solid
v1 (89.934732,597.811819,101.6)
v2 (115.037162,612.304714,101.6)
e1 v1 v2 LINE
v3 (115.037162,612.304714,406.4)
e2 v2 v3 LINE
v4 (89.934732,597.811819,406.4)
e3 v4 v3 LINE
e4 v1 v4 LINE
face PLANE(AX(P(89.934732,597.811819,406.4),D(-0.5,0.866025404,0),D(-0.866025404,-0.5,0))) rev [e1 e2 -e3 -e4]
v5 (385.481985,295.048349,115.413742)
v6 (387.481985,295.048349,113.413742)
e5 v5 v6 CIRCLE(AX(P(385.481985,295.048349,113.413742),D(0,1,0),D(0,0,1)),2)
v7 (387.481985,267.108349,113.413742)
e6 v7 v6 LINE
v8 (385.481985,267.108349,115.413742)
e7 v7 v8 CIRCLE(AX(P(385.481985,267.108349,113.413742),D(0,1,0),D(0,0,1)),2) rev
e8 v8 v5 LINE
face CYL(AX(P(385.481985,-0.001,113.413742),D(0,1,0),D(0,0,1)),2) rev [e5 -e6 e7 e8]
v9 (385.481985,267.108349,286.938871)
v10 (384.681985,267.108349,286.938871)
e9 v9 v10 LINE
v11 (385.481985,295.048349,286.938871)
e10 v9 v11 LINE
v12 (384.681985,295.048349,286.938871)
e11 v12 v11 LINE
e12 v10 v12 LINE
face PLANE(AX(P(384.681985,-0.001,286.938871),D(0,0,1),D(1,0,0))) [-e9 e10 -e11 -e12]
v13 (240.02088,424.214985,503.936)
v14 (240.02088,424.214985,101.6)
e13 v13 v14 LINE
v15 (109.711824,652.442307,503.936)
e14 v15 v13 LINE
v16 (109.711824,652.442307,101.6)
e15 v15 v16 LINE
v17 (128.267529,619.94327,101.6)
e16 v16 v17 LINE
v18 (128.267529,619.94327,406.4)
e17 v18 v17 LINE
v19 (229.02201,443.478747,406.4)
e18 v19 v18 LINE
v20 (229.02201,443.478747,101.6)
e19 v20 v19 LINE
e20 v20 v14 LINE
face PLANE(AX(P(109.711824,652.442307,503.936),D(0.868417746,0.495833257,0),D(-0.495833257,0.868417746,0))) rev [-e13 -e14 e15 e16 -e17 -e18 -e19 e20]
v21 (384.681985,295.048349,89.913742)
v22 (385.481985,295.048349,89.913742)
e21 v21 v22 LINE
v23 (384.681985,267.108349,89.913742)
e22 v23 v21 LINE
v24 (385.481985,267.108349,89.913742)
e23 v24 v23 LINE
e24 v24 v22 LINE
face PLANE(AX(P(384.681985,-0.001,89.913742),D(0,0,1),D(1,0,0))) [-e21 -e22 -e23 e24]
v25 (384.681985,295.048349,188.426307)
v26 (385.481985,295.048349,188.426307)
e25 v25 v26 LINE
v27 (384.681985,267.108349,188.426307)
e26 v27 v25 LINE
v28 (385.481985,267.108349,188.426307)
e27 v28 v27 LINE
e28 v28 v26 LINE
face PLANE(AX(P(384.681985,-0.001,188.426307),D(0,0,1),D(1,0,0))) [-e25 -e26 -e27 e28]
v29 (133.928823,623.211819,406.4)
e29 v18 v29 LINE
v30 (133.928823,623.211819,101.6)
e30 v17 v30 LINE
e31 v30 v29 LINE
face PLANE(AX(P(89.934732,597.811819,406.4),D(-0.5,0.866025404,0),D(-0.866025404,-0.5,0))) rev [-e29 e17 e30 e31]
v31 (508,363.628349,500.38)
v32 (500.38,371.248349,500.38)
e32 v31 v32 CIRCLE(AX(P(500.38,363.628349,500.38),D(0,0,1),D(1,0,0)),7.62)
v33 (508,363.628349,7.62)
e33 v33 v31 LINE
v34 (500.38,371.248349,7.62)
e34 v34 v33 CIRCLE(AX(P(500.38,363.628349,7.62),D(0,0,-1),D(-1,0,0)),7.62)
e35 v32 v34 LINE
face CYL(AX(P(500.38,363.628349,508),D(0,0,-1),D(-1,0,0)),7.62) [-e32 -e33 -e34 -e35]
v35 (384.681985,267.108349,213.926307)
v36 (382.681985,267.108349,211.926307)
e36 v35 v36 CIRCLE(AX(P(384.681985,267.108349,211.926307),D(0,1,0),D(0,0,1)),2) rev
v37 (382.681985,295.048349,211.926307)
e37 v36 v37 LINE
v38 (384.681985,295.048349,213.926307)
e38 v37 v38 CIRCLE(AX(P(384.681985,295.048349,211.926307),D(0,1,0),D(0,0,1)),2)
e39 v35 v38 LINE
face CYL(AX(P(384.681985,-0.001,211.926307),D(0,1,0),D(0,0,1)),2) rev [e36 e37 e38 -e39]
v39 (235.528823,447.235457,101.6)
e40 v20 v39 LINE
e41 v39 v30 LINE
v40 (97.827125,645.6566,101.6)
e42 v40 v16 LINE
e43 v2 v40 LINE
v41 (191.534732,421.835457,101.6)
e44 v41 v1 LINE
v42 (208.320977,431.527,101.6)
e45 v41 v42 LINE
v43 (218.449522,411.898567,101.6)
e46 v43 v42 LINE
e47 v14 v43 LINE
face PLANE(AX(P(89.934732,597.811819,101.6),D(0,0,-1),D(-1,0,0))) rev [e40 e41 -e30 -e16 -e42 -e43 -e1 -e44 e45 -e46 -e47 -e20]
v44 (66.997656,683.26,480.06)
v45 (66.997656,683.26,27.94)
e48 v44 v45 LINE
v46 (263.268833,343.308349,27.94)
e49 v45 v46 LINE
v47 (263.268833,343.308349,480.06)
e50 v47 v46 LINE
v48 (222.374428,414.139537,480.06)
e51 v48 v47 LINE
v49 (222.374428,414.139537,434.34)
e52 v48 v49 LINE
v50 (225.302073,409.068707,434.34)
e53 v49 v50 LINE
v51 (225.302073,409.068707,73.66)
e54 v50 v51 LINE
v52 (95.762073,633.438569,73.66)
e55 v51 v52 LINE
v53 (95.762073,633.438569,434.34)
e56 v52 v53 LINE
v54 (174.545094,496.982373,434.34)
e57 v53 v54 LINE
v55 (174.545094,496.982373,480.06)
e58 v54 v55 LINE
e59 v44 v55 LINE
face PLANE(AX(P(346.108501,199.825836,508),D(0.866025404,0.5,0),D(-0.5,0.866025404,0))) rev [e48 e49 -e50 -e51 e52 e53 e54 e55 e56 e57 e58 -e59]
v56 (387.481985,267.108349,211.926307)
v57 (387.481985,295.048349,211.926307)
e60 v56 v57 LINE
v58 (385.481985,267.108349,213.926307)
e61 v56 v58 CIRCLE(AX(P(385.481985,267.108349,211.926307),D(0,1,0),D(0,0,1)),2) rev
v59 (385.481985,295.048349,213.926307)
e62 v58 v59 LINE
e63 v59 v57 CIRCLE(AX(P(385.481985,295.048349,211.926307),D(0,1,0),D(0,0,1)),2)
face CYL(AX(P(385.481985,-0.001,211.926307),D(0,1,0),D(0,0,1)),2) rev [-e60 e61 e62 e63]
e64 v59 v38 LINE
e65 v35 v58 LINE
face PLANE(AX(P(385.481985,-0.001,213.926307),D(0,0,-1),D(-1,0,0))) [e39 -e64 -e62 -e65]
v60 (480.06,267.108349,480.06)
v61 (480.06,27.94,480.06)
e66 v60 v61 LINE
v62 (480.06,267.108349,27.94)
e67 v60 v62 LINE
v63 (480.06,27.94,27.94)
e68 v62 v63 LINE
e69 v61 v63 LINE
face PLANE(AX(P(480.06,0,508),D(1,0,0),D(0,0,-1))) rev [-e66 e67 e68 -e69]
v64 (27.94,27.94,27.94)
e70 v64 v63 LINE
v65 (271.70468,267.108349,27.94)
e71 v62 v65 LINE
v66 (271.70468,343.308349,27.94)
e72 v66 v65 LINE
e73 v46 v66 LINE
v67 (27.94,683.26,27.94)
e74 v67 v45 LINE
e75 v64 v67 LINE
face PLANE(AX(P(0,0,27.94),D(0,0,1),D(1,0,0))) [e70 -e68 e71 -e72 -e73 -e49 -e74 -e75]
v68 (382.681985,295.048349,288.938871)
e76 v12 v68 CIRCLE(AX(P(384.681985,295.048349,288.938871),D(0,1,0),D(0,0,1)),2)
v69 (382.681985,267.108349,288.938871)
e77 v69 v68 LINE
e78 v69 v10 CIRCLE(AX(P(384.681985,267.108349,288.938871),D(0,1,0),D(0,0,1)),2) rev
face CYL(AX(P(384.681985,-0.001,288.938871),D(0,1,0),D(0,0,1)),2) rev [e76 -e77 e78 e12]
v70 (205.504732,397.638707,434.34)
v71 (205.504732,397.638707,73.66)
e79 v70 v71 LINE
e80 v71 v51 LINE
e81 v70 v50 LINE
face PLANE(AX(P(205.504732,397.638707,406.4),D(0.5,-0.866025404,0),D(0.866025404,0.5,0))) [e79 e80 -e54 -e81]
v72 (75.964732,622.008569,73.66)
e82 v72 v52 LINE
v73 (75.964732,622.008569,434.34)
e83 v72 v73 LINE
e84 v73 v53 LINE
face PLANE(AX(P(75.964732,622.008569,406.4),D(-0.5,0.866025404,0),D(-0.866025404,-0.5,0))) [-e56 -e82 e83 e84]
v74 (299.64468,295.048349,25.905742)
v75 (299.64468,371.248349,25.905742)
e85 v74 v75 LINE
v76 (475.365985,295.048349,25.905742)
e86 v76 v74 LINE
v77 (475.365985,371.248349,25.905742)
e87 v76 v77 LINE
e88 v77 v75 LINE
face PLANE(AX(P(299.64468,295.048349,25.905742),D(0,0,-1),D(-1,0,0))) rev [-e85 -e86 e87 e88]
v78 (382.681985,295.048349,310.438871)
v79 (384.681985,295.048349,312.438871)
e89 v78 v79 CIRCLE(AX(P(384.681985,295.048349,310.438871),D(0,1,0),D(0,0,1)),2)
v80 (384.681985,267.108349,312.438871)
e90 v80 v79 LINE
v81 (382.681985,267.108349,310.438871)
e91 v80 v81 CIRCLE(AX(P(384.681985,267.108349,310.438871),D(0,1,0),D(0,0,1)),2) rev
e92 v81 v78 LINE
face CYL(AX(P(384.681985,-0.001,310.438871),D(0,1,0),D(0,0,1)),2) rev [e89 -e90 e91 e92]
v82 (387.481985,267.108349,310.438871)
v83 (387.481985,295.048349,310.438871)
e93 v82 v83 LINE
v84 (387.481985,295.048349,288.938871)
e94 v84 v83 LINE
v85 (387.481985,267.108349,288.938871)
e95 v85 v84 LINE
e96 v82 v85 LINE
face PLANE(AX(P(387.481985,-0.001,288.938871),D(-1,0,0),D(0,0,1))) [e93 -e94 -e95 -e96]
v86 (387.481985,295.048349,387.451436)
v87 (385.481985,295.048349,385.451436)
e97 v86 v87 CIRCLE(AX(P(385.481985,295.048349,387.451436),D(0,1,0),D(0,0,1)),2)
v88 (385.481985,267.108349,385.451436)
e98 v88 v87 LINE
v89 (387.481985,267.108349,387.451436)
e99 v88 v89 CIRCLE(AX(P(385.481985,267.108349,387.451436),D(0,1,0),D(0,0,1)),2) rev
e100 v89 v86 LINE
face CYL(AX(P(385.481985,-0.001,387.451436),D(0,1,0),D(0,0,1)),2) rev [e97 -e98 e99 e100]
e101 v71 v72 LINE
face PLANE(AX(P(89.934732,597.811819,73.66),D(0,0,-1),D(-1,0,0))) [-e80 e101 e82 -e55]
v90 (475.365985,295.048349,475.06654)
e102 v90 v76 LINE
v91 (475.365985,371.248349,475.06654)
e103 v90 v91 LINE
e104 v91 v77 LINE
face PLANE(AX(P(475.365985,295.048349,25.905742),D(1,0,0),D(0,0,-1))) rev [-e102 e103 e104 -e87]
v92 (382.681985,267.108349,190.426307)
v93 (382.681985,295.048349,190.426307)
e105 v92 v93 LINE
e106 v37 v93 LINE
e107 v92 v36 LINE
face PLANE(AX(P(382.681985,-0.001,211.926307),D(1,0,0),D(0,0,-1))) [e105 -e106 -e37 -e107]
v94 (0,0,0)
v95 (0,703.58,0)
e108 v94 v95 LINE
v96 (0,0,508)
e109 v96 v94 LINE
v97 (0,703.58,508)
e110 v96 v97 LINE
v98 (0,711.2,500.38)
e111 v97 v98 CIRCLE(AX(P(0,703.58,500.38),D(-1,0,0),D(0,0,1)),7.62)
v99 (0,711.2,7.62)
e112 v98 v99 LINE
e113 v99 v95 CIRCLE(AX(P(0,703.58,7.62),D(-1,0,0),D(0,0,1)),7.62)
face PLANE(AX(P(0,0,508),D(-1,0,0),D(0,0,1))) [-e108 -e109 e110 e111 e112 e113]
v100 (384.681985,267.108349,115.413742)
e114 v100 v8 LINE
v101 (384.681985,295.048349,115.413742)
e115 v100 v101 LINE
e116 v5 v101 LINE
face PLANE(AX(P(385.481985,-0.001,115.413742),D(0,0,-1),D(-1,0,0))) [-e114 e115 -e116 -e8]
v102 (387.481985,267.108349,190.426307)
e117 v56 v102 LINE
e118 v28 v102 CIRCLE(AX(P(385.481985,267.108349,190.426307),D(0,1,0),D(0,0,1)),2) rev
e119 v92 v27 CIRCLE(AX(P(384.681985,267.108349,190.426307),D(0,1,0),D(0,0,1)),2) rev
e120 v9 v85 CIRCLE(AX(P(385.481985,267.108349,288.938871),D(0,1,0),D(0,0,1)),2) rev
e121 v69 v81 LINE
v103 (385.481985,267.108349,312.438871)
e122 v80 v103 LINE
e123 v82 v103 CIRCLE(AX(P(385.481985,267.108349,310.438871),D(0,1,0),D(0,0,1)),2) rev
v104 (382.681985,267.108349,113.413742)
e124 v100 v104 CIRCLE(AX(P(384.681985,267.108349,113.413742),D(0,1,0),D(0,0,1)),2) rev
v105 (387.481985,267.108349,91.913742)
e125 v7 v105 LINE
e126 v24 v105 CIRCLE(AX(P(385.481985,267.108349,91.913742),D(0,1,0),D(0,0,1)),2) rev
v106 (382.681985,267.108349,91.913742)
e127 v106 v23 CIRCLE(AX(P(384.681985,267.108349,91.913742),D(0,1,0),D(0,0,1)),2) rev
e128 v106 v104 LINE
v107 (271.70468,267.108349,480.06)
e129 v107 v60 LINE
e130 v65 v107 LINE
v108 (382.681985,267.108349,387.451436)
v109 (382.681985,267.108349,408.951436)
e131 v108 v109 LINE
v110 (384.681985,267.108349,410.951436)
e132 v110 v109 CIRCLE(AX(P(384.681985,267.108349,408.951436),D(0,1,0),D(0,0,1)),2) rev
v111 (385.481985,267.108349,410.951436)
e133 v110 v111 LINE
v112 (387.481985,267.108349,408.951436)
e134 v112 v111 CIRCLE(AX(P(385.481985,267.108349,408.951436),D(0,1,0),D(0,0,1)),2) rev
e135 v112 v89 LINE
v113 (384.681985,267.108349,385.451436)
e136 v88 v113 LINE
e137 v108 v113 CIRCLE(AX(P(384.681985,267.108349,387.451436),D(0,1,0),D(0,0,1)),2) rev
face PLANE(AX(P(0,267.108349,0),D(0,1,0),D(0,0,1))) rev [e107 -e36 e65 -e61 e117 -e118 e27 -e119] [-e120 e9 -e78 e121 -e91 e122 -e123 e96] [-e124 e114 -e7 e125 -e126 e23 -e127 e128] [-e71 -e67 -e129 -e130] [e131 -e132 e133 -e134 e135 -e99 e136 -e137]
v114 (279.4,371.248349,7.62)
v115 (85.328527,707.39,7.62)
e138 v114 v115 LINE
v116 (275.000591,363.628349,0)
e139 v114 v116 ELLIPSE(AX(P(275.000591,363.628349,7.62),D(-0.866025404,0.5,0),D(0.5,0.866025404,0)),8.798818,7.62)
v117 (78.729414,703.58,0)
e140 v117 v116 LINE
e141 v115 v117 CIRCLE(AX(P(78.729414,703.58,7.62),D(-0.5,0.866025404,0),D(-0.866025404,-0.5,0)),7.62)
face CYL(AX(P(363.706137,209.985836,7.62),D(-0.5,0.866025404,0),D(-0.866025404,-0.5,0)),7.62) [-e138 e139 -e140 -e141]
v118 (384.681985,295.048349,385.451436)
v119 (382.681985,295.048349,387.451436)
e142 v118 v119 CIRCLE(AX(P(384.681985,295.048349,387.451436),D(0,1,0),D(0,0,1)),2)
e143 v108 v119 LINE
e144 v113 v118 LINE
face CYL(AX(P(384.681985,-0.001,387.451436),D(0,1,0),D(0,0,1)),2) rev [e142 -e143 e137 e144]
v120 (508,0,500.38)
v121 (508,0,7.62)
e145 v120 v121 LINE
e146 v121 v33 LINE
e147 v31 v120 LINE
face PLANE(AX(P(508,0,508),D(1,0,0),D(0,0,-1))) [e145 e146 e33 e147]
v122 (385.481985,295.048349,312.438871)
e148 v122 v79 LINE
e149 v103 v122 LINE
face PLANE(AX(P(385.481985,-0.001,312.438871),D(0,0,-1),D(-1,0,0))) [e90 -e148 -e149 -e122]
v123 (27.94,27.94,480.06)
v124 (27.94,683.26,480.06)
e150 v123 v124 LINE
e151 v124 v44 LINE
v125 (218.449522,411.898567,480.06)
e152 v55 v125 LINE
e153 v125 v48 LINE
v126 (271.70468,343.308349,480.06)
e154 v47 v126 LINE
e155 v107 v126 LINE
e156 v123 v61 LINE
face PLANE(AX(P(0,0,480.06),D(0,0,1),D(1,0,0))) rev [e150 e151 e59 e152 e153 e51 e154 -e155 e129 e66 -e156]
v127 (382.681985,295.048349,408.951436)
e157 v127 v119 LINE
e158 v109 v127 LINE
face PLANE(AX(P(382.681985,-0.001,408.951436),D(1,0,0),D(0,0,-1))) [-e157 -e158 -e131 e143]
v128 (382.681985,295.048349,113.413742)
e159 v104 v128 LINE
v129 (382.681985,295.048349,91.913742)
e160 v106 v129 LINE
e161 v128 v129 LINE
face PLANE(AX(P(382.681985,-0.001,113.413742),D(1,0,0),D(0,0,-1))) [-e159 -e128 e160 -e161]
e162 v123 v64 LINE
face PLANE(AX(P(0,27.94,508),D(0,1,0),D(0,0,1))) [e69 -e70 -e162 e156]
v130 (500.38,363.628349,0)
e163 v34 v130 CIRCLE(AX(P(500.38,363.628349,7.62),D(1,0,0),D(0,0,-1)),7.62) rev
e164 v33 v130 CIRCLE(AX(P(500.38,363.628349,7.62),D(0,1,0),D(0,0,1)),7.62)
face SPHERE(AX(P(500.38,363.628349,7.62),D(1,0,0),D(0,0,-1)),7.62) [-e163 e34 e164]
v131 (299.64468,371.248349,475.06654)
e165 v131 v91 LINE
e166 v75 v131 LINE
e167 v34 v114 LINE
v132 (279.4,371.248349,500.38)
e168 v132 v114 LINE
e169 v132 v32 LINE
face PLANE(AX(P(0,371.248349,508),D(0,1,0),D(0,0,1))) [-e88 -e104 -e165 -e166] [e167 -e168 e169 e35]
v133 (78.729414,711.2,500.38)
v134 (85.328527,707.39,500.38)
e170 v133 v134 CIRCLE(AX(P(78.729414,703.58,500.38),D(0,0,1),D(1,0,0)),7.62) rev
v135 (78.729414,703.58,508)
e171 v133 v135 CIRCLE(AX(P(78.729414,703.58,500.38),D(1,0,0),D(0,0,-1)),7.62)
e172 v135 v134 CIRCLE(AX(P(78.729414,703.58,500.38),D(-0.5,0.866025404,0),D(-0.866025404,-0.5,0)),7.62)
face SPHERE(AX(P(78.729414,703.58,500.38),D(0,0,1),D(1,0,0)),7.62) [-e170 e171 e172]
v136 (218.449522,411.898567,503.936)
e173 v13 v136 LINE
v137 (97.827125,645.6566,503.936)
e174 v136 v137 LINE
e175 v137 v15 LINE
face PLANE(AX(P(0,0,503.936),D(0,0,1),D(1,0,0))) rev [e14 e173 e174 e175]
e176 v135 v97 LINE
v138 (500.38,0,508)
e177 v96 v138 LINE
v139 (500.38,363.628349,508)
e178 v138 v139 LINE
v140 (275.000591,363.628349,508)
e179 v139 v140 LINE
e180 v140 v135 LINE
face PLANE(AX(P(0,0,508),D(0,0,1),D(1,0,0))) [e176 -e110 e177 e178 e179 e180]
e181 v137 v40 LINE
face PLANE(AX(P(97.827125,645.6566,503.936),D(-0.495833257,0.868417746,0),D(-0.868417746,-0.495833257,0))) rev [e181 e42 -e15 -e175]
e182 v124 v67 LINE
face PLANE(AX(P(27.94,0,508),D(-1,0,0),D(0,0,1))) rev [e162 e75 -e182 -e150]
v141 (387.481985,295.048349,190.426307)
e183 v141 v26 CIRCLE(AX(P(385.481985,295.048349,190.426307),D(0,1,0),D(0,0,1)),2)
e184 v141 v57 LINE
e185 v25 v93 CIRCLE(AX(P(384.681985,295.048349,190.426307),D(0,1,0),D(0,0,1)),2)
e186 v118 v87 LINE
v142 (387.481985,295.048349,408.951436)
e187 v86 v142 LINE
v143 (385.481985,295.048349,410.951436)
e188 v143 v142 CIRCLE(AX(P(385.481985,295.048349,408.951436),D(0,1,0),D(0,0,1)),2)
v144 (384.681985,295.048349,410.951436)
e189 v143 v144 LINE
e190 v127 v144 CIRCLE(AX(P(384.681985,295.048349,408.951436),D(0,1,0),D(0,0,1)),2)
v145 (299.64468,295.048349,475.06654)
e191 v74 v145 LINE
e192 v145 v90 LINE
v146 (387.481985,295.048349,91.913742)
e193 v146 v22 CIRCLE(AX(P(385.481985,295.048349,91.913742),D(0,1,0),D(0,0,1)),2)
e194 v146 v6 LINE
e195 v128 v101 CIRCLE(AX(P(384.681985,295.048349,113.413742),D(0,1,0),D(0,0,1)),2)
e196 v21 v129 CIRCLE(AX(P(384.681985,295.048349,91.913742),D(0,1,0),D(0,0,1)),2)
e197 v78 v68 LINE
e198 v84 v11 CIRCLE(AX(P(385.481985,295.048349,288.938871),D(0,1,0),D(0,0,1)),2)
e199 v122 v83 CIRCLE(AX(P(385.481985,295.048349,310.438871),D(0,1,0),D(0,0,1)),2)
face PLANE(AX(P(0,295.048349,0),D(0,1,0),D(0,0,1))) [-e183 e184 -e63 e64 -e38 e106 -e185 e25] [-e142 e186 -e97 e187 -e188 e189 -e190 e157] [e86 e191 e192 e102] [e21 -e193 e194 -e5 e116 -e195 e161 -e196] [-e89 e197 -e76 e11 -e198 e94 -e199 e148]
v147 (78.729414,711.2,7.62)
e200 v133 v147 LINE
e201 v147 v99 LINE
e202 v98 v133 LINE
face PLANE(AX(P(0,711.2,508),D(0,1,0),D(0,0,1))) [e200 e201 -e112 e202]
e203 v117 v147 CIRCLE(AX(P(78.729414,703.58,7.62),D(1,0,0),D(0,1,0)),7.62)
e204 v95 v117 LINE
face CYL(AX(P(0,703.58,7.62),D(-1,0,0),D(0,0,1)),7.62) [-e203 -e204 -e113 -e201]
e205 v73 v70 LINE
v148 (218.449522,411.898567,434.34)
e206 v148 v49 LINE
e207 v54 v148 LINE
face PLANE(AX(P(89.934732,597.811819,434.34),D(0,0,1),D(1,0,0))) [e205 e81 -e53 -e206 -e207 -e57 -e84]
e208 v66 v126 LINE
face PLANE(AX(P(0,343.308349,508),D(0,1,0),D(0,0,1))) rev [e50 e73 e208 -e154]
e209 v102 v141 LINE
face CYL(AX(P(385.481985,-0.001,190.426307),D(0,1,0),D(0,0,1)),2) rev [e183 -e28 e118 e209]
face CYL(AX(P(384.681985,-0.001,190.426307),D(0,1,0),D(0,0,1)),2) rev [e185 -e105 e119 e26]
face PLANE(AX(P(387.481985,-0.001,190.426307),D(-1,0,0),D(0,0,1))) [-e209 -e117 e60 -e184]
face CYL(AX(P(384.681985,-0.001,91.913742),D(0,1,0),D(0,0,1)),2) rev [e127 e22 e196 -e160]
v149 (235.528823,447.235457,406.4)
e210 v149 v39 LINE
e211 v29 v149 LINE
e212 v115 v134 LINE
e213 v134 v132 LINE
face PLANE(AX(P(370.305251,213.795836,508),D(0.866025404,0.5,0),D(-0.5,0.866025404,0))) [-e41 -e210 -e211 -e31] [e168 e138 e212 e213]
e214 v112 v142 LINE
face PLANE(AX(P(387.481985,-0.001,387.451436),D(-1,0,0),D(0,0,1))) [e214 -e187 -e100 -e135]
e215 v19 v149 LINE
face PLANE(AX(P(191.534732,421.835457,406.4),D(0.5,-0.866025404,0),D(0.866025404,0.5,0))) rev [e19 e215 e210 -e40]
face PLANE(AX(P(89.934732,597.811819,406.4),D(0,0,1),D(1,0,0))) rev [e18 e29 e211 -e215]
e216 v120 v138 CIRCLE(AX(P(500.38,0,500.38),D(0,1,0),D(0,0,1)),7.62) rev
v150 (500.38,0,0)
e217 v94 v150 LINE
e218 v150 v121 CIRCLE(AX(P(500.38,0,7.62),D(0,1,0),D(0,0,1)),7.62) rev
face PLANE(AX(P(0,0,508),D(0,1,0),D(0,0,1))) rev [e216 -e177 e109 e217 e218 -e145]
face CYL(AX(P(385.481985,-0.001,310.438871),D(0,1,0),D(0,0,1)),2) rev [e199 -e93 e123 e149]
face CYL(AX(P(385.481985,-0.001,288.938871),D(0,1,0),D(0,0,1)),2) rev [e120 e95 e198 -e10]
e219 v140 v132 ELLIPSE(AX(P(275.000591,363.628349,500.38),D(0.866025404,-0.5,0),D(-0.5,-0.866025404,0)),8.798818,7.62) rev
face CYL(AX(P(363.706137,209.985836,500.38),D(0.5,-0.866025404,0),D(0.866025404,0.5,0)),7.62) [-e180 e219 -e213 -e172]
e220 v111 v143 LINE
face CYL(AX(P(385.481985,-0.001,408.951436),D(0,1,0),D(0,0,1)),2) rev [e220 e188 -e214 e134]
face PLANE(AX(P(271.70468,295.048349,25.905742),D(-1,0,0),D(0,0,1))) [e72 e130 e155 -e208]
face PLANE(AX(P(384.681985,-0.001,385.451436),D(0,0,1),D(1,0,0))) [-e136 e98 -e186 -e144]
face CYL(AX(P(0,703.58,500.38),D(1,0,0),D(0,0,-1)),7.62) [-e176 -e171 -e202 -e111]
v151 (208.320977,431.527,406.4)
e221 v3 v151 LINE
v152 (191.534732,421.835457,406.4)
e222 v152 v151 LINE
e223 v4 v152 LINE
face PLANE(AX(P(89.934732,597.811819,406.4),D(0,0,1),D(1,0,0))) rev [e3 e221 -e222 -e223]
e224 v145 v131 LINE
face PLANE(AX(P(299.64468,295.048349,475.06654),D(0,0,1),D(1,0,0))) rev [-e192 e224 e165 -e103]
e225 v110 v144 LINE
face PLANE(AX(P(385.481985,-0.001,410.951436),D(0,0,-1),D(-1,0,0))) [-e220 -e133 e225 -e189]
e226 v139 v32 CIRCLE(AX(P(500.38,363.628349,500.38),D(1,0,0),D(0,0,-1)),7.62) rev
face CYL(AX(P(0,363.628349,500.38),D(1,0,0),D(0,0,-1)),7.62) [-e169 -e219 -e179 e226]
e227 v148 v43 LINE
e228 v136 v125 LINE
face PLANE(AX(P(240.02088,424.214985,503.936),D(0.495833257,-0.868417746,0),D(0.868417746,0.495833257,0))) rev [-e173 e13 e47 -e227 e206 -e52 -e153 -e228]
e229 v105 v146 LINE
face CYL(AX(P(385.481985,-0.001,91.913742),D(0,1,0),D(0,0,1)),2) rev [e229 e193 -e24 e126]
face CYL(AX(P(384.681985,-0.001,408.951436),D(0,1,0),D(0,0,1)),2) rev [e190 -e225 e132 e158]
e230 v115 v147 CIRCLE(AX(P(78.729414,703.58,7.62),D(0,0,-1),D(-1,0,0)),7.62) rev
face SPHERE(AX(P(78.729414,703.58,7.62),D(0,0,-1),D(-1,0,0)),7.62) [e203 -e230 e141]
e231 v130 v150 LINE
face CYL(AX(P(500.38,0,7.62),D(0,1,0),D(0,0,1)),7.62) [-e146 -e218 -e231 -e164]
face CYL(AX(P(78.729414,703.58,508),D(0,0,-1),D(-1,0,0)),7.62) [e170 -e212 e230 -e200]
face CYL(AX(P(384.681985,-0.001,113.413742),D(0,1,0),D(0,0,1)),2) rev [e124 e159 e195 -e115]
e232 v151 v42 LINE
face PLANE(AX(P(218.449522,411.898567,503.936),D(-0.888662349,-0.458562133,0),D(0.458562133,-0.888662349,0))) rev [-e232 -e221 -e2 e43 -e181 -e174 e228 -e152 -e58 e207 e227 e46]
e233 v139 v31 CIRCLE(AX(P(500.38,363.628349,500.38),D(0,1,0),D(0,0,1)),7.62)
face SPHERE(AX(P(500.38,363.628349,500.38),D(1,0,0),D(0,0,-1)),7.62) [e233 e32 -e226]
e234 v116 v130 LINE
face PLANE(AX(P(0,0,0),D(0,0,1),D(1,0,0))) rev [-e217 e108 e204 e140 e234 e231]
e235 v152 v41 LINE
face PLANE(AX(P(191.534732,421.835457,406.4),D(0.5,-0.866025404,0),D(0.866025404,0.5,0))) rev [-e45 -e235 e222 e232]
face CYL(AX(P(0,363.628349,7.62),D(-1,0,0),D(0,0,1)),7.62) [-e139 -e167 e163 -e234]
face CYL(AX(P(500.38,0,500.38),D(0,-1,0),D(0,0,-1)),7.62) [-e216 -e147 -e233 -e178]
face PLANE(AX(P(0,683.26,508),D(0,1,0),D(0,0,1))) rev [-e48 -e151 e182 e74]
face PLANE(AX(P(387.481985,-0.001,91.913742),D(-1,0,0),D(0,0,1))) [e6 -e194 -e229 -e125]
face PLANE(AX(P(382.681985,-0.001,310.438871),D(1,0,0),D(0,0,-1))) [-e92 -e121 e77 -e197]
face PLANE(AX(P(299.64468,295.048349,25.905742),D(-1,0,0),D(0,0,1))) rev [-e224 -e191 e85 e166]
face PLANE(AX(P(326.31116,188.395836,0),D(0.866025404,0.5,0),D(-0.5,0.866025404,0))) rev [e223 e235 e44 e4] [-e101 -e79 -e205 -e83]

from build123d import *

# Parameters (mm, degrees)
BOSS_EXTRUDE1_DEPTH            = 508
SKETCH2_W                      = 175.72130466
SKETCH2_H                      = 449.160798253
CUT_EXTRUDE1_DEPTH             = 76.2
SKETCH3_W                      = 304.8
SKETCH3_H                      = 203.2
CUT_EXTRUDE3_DEPTH             = 50.8
SHELL2_START                   = 27.94
SHELL2_DEPTH                   = 452.12
SHELL2_2_DEPTH                 = 45.72
SHELL2_START_2                 = 434.34
SHELL2_3_DEPTH                 = 45.72
FILLET1_R                      = 7.62
CUT_EXTRUDE4_REACH             = 965.862
CUT_EXTRUDE4_DIRECTION_2_DEPTH = 97.536
CUT_EXTRUDE5_REACH             = 832.247


# Read off the part's stored shape, not the designer's step: Shell2
with BuildPart() as part:
    # Sketch1 → Boss-Extrude1 (new body)
    with BuildSketch(Plane.XY):
        Polygon((508, 0), (508, 371.248348728), (279.4, 371.248348728), (83.128822626, 711.2), (0, 711.2), (0, 0), align=None)
    extrude(amount=BOSS_EXTRUDE1_DEPTH)

    # Sketch2 → Cut-Extrude1 (cut)
    with BuildSketch(Plane(origin=(0, 371.248348728, 0), x_dir=(1, 0, 0), z_dir=(0, 1, 0))):
        with Locations((387.505332687, -250.48614125)):
            Rectangle(SKETCH2_W, SKETCH2_H)
    extrude(amount=-CUT_EXTRUDE1_DEPTH, mode=Mode.SUBTRACT)

    # Sketch3 → Cut-Extrude3 (cut)
    with BuildSketch(Plane(origin=(370.305250556, 213.795836091, 0), x_dir=(0, 0, -1), z_dir=(0.8660254037844397, 0.49999999999999806, 0))):
        with Locations((-254, 371.152855858)):
            Rectangle(SKETCH3_W, SKETCH3_H)
    extrude(amount=-CUT_EXTRUDE3_DEPTH, mode=Mode.SUBTRACT)

    # Shell2 outline → Shell2 (cut)
    with BuildSketch(Plane.XY.offset(SHELL2_START)):
        Polygon((27.94, 27.94), (480.06, 27.94), (480.06, 267.108348728), (271.704680357, 267.108348728), (271.704680357, 343.308348728), (263.268833479, 343.308348728), (225.302072845, 409.068707145), (205.504732114, 397.638707145), (191.534732114, 421.835456927), (89.934732114, 597.811818976), (75.964732114, 622.008568757), (95.762072845, 633.438568757), (66.997656105, 683.26), (27.94, 683.26), align=None)
    extrude(amount=SHELL2_DEPTH, mode=Mode.SUBTRACT)

    # Shell2 2 outline → Shell2 2 (cut)
    with BuildSketch(Plane.XY.offset(SHELL2_START)):
        Polygon((225.302072845, 409.068707145), (95.762072845, 633.438568757), (75.964732114, 622.008568757), (89.934732114, 597.811818976), (191.534732114, 421.835456927), (205.504732114, 397.638707145), align=None)
    extrude(amount=SHELL2_2_DEPTH, mode=Mode.SUBTRACT)

    # Shell2 3 outline → Shell2 3 (cut)
    with BuildSketch(Plane.XY.offset(SHELL2_START_2)):
        Polygon((225.302072845, 409.068707145), (95.762072845, 633.438568757), (75.964732114, 622.008568757), (89.934732114, 597.811818976), (191.534732114, 421.835456927), (205.504732114, 397.638707145), align=None)
    extrude(amount=SHELL2_3_DEPTH, mode=Mode.SUBTRACT)

    # Fillet1
    fillet1_edges = [part.edges().sort_by_distance(p)[0] for p in [
        (508, 185.624174364, 0),
        (393.7, 371.248348728, 508),
        (83.128822626, 711.2, 254),
        (508, 371.248348728, 254),
        (181.264411313, 541.224174364, 508),
        (41.564411313, 711.2, 508),
        (508, 185.624174364, 508),
        (41.564411313, 711.2, 0),
        (181.264411313, 541.224174364, 0),
        (393.7, 371.248348728, 0),
    ]]
    fillet(fillet1_edges, radius=FILLET1_R)

    # Cut-Extrude4: up to this face of the body (flat: up to its plane)
    cut_extrude4_end = Plane(part.part.faces().sort_by_distance((162.73177737, 522.523637951, 101.6))[0])
    # Sketch6 → Cut-Extrude4 (cut, up to the picked face)
    with BuildSketch(Plane(origin=(0, 0, 406.4), x_dir=(-1, 0, 0), z_dir=(0, 0, -1)), mode=Mode.PRIVATE) as cut_extrude4_sk1:
        Polygon((-109.711824261, 652.442307464), (-240.02087993, 424.214985446), (-218.44952186, 411.898566558), (-97.827125151, 645.656599669), align=None)
    cut_extrude4_tool1 = split(extrude(cut_extrude4_sk1.sketch, amount=CUT_EXTRUDE4_REACH, mode=Mode.PRIVATE), bisect_by=cut_extrude4_end, keep=Keep.BOTH, mode=Mode.PRIVATE)
    add(cut_extrude4_tool1.solids().sort_by(Axis((172.556766, 522.406417, 406.4), (0, 0, -1)))[0], mode=Mode.SUBTRACT)

    # Sketch6 → Cut-Extrude4 direction 2 (cut)
    with BuildSketch(Plane(origin=(0, 0, 406.4), x_dir=(-1, 0, 0), z_dir=(0, 0, -1))):
        Polygon((-109.711824261, 652.442307464), (-240.02087993, 424.214985446), (-218.44952186, 411.898566558), (-97.827125151, 645.656599669), align=None)
    extrude(amount=-CUT_EXTRUDE4_DIRECTION_2_DEPTH, mode=Mode.SUBTRACT)

    # Sketch10 → Cut-Extrude5 (cut, up to next)
    with BuildSketch(Plane(origin=(0, 295.048348728, 0), x_dir=(1, 0, 0), z_dir=(0, 1, 0)), mode=Mode.PRIVATE) as cut_extrude5_sk1:
        with BuildLine():
            Line((384.681985017, -385.451435914), (385.481985017, -385.451435914))
            ThreePointArc((385.481985017, -385.451435914), (386.896198579, -386.037222352), (387.481985017, -387.451435914))
            Line((387.481985017, -387.451435914), (387.481985017, -408.951435914))
            ThreePointArc((387.481985017, -408.951435914), (386.896198579, -410.365649476), (385.481985017, -410.951435914))
            Line((385.481985017, -410.951435914), (384.681985017, -410.951435914))
            ThreePointArc((384.681985017, -410.951435914), (383.267771454, -410.365649476), (382.681985017, -408.951435914))
            Line((382.681985017, -408.951435914), (382.681985017, -387.451435914))
            ThreePointArc((382.681985017, -387.451435914), (383.267771454, -386.037222352), (384.681985017, -385.451435914))
        make_face()
    cut_extrude5_tool1 = extrude(cut_extrude5_sk1.sketch, amount=-CUT_EXTRUDE5_REACH, mode=Mode.PRIVATE) & part.part
    # Sketch10 → Cut-Extrude5 (cut, up to next)
    with BuildSketch(Plane(origin=(0, 295.048348728, 0), x_dir=(1, 0, 0), z_dir=(0, 1, 0)), mode=Mode.PRIVATE) as cut_extrude5_sk2:
        with BuildLine():
            Line((385.481985017, -312.438871317), (384.681985017, -312.438871317))
            ThreePointArc((384.681985017, -312.438871317), (383.267771454, -311.853084879), (382.681985017, -310.438871317))
            Line((382.681985017, -310.438871317), (382.681985017, -288.938871317))
            ThreePointArc((382.681985017, -288.938871317), (383.267771454, -287.524657755), (384.681985017, -286.938871317))
            Line((384.681985017, -286.938871317), (385.481985017, -286.938871317))
            ThreePointArc((385.481985017, -286.938871317), (386.896198579, -287.524657755), (387.481985017, -288.938871317))
            Line((387.481985017, -288.938871317), (387.481985017, -310.438871317))
            ThreePointArc((387.481985017, -310.438871317), (386.896198579, -311.853084879), (385.481985017, -312.438871317))
        make_face()
    cut_extrude5_tool2 = extrude(cut_extrude5_sk2.sketch, amount=-CUT_EXTRUDE5_REACH, mode=Mode.PRIVATE) & part.part
    # Sketch10 → Cut-Extrude5 (cut, up to next)
    with BuildSketch(Plane(origin=(0, 295.048348728, 0), x_dir=(1, 0, 0), z_dir=(0, 1, 0)), mode=Mode.PRIVATE) as cut_extrude5_sk3:
        with BuildLine():
            Line((385.481985017, -213.92630672), (384.681985017, -213.92630672))
            ThreePointArc((384.681985017, -213.92630672), (383.267771454, -213.340520282), (382.681985017, -211.92630672))
            Line((382.681985017, -211.92630672), (382.681985017, -190.42630672))
            ThreePointArc((382.681985017, -190.42630672), (383.267771454, -189.012093158), (384.681985017, -188.42630672))
            Line((384.681985017, -188.42630672), (385.481985017, -188.42630672))
            ThreePointArc((385.481985017, -188.42630672), (386.896198579, -189.012093158), (387.481985017, -190.42630672))
            Line((387.481985017, -190.42630672), (387.481985017, -211.92630672))
            ThreePointArc((387.481985017, -211.92630672), (386.896198579, -213.340520282), (385.481985017, -213.92630672))
        make_face()
    cut_extrude5_tool3 = extrude(cut_extrude5_sk3.sketch, amount=-CUT_EXTRUDE5_REACH, mode=Mode.PRIVATE) & part.part
    # Sketch10 → Cut-Extrude5 (cut, up to next)
    with BuildSketch(Plane(origin=(0, 295.048348728, 0), x_dir=(1, 0, 0), z_dir=(0, 1, 0)), mode=Mode.PRIVATE) as cut_extrude5_sk4:
        with BuildLine():
            Line((385.481985017, -115.413742123), (384.681985017, -115.413742123))
            ThreePointArc((384.681985017, -115.413742123), (383.267771454, -114.827955685), (382.681985017, -113.413742123))
            Line((382.681985017, -113.413742123), (382.681985017, -91.913742123))
            ThreePointArc((382.681985017, -91.913742123), (383.267771454, -90.499528561), (384.681985017, -89.913742123))
            Line((384.681985017, -89.913742123), (385.481985017, -89.913742123))
            ThreePointArc((385.481985017, -89.913742123), (386.896198579, -90.499528561), (387.481985017, -91.913742123))
            Line((387.481985017, -91.913742123), (387.481985017, -113.413742123))
            ThreePointArc((387.481985017, -113.413742123), (386.896198579, -114.827955685), (385.481985017, -115.413742123))
        make_face()
    cut_extrude5_tool4 = extrude(cut_extrude5_sk4.sketch, amount=-CUT_EXTRUDE5_REACH, mode=Mode.PRIVATE) & part.part
    add(cut_extrude5_tool1.solids().sort_by_distance((385.081985, 295.048349, 398.201436))[0], mode=Mode.SUBTRACT)
    add(cut_extrude5_tool2.solids().sort_by_distance((385.081985, 295.048349, 299.688871))[0], mode=Mode.SUBTRACT)
    add(cut_extrude5_tool3.solids().sort_by_distance((385.081985, 295.048349, 201.176307))[0], mode=Mode.SUBTRACT)
    add(cut_extrude5_tool4.solids().sort_by_distance((385.081985, 295.048349, 102.663742))[0], mode=Mode.SUBTRACT)


solid = part.part
